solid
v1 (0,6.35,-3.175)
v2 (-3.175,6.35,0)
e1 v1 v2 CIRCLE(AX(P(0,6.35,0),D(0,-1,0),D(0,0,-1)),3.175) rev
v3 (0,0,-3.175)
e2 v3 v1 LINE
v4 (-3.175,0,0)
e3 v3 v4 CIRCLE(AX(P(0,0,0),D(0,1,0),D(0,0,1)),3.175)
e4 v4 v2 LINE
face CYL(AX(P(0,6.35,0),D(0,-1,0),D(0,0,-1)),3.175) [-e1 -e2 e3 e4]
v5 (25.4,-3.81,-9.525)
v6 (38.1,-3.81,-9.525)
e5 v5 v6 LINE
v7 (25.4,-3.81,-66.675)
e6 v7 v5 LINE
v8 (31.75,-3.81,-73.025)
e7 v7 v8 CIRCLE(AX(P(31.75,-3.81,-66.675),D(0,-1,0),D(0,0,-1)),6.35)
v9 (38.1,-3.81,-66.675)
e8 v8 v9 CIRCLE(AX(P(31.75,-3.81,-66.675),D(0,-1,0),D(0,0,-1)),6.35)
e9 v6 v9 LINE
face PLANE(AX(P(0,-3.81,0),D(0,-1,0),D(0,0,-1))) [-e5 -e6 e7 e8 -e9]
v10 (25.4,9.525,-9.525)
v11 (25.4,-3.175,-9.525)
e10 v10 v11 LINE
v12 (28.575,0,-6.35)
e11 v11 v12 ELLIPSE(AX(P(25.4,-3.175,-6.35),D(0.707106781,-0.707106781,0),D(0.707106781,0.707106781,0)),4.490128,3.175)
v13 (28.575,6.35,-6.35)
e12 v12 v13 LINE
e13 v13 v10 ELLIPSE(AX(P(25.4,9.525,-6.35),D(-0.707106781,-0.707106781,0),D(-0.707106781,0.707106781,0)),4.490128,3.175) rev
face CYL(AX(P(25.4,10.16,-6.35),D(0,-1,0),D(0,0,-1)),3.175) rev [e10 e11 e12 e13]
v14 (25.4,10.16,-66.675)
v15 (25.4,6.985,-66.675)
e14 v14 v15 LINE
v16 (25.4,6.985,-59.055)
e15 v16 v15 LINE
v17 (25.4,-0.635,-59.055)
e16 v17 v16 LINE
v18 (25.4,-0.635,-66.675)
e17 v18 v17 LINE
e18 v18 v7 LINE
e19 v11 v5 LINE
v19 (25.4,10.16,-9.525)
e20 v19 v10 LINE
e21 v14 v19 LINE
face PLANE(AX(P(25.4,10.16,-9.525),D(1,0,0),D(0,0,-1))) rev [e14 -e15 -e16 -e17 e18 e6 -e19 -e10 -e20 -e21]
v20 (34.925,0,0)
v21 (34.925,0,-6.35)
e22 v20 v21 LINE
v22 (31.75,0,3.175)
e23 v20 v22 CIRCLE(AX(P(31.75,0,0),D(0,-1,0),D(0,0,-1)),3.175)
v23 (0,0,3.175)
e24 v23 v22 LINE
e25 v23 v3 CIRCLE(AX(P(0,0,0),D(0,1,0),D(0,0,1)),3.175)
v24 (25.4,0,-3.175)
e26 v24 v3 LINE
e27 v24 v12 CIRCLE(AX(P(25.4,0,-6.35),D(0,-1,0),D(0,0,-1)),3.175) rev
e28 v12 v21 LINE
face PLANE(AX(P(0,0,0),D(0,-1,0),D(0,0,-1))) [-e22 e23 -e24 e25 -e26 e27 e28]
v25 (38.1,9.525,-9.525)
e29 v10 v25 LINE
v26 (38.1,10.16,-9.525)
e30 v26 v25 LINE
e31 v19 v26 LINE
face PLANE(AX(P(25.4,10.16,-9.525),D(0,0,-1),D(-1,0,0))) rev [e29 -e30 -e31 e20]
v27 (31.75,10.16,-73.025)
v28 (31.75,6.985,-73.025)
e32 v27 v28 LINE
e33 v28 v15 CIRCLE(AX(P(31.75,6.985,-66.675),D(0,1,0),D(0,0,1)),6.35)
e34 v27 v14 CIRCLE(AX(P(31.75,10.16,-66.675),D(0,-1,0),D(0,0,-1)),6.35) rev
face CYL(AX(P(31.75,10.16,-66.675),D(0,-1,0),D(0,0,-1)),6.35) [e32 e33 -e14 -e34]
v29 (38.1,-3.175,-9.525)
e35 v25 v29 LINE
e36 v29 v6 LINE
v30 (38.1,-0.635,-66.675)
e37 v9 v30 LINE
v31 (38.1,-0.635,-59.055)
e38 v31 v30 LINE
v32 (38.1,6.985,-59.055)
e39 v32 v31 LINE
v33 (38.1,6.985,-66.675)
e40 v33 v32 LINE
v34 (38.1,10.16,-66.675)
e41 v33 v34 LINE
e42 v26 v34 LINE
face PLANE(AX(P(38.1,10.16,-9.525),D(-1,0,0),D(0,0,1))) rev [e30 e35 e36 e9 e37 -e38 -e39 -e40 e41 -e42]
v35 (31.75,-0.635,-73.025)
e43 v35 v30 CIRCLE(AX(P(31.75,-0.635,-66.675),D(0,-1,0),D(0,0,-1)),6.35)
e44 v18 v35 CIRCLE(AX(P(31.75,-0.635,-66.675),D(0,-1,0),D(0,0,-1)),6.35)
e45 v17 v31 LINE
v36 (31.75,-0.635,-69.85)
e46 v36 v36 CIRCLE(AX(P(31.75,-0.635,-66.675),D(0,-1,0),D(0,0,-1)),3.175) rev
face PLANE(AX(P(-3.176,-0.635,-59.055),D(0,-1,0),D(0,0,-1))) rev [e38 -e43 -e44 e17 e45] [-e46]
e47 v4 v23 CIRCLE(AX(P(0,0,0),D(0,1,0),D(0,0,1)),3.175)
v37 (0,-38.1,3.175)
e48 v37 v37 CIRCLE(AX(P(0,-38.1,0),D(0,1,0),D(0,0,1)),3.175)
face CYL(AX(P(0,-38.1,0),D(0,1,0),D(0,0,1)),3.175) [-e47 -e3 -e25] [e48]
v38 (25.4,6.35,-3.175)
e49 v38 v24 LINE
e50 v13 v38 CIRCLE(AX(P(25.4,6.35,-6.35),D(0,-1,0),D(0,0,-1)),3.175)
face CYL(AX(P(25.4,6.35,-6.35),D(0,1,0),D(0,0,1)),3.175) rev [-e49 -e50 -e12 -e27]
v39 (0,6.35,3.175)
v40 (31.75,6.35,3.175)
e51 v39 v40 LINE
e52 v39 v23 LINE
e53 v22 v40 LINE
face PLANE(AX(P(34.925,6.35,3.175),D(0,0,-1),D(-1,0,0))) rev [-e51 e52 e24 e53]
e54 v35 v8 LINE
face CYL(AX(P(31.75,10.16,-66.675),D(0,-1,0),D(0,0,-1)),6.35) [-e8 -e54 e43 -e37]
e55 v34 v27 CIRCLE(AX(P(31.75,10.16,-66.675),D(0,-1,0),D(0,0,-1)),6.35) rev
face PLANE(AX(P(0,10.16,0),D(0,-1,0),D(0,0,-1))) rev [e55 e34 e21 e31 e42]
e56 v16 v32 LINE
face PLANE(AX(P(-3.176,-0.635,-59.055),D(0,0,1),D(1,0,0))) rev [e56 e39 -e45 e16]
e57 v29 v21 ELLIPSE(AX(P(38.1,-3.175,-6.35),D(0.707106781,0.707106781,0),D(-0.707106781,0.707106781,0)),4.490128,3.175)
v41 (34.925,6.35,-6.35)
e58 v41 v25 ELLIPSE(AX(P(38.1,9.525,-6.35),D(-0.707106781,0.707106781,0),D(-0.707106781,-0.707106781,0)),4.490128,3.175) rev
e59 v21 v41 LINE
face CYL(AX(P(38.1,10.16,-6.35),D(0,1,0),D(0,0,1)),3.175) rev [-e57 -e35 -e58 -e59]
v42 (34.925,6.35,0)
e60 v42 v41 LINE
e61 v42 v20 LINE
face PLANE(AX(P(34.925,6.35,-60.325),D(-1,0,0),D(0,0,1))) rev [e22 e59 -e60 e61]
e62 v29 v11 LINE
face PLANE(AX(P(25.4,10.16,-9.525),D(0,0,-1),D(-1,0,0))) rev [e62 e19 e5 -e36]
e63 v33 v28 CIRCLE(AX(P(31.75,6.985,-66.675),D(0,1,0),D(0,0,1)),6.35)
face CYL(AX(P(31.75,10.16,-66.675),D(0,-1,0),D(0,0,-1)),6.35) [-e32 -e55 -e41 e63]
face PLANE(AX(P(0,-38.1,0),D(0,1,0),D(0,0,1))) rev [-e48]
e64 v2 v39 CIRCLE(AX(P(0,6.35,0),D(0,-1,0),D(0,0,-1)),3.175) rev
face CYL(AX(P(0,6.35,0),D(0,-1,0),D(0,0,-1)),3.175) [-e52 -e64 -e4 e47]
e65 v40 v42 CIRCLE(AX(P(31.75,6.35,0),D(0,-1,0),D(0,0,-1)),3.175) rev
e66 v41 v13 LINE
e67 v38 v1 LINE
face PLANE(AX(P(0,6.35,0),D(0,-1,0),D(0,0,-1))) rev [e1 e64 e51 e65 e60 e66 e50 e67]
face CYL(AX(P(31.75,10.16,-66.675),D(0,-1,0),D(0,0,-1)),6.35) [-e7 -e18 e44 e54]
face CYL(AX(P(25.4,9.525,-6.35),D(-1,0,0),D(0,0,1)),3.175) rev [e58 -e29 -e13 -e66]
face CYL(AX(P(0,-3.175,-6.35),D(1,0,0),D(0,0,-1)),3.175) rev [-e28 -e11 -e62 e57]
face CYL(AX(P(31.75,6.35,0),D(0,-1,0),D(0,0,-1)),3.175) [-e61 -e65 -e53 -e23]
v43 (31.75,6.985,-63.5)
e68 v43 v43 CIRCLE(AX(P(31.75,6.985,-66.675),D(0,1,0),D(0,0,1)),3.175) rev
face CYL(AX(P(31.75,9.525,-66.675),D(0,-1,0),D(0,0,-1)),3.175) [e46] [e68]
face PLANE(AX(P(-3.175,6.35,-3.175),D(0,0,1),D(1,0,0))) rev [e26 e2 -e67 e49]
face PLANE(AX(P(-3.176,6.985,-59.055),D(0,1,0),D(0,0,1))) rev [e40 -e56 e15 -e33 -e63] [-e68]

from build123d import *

# Parameters (mm, degrees)
SKETCH1_R                = 3.175
BOSS_EXTRUDE1_DEPTH      = 38.1
BOSS_EXTRUDE2_DEPTH      = 6.35
FILLET1_R                = 3.175
BOSS_EXTRUDE3_DEPTH      = 3.81
BOSS_EXTRUDE3_DEPTH_BACK = 10.16
SKETCH3_W                = 12.7
SKETCH3_H                = 63.5
FILLET2_R                = 3.175
FILLET3_R                = 6.35
CUT_EXTRUDE1_REACH       = 94.13
SKETCH4_W                = 15.24
SKETCH4_H                = 7.62
SKETCH5_R                = 3.175
BOSS_EXTRUDE4_DEPTH      = 10.16


with BuildPart() as part:
    # Sketch1 → Boss-Extrude1 (new body)
    with BuildSketch(Plane(origin=(0, 0, 0), x_dir=(1, 0, 0), z_dir=(0, 1, 0))):
        with Locations(Location((0, 0, 0), (0, 0, 270))):
            Circle(SKETCH1_R)
    extrude(amount=-BOSS_EXTRUDE1_DEPTH)

    # Sketch2 → Boss-Extrude2 (add)
    with BuildSketch(Plane(origin=(0, 0, 0), x_dir=(1, 0, 0), z_dir=(0, 1, 0))):
        Polygon((34.925, -3.175), (-3.175, -3.175), (-3.175, 3.175), (28.575, 3.175), (28.575, 60.325), (34.925, 60.325), align=None)
    extrude(amount=BOSS_EXTRUDE2_DEPTH)

    # Fillet1
    fillet1_edges = [part.edges().sort_by_distance(p)[0] for p in [
        (28.575, 3.175, -3.175),
        (34.925, 3.175, 3.175),
        (-3.175, 3.175, -3.175),
        (-3.175, 3.175, 3.175),
    ]]
    fillet(fillet1_edges, radius=FILLET1_R - 0.0001)  # a hair under: the kernel refuses the full size

    # Sketch3 → Boss-Extrude3 (add, two sides: drawn at the far end of the back side and taken through both)
    with BuildSketch(Plane(origin=(0, 6.35, 0), x_dir=(1, 0, 0), z_dir=(0, 1, 0)).offset(-BOSS_EXTRUDE3_DEPTH_BACK)):
        with Locations((31.75, 41.275)):
            Rectangle(SKETCH3_W, SKETCH3_H)
    extrude(amount=BOSS_EXTRUDE3_DEPTH + BOSS_EXTRUDE3_DEPTH_BACK)

    # Fillet2
    fillet2_edges = [part.edges().sort_by_distance(p)[0] for p in [
        (28.575, 3.175, -9.525),
        (31.75, 0, -9.525),
        (34.925, 3.175, -9.525),
        (31.75, 6.35, -9.525),
    ]]
    fillet(fillet2_edges, radius=FILLET2_R - 0.0001)  # a hair under: the kernel refuses the full size

    # Fillet3
    fillet3_edges = [part.edges().sort_by_distance(p)[0] for p in [
        (25.4, 3.175, -73.025),
        (38.1, 3.175, -73.025),
    ]]
    fillet(fillet3_edges, radius=FILLET3_R - 0.0001)  # a hair under: the kernel refuses the full size

    # Sketch4 → Cut-Extrude1 (cut, up to next)
    with BuildSketch(Plane(origin=(38.1, 0, 0), x_dir=(0, 0, -1), z_dir=(1, 0, 0)), mode=Mode.PRIVATE) as cut_extrude1_sk1:
        with Locations((66.675, 3.175)):
            Rectangle(SKETCH4_W, SKETCH4_H)
    cut_extrude1_tool1 = extrude(cut_extrude1_sk1.sketch, amount=-CUT_EXTRUDE1_REACH, mode=Mode.PRIVATE) & part.part
    add(cut_extrude1_tool1.solids().sort_by_distance((38.1, 3.175, -66.675))[0], mode=Mode.SUBTRACT)

    # Sketch5 → Boss-Extrude4 (add)
    with BuildSketch(Plane(origin=(0, -0.635, 0), x_dir=(1, 0, 0), z_dir=(0, 1, 0))):
        with Locations(Location((31.75, 66.675, 0), (0, 0, 90))):
            Circle(SKETCH5_R)
    extrude(amount=BOSS_EXTRUDE4_DEPTH)


solid = part.part
